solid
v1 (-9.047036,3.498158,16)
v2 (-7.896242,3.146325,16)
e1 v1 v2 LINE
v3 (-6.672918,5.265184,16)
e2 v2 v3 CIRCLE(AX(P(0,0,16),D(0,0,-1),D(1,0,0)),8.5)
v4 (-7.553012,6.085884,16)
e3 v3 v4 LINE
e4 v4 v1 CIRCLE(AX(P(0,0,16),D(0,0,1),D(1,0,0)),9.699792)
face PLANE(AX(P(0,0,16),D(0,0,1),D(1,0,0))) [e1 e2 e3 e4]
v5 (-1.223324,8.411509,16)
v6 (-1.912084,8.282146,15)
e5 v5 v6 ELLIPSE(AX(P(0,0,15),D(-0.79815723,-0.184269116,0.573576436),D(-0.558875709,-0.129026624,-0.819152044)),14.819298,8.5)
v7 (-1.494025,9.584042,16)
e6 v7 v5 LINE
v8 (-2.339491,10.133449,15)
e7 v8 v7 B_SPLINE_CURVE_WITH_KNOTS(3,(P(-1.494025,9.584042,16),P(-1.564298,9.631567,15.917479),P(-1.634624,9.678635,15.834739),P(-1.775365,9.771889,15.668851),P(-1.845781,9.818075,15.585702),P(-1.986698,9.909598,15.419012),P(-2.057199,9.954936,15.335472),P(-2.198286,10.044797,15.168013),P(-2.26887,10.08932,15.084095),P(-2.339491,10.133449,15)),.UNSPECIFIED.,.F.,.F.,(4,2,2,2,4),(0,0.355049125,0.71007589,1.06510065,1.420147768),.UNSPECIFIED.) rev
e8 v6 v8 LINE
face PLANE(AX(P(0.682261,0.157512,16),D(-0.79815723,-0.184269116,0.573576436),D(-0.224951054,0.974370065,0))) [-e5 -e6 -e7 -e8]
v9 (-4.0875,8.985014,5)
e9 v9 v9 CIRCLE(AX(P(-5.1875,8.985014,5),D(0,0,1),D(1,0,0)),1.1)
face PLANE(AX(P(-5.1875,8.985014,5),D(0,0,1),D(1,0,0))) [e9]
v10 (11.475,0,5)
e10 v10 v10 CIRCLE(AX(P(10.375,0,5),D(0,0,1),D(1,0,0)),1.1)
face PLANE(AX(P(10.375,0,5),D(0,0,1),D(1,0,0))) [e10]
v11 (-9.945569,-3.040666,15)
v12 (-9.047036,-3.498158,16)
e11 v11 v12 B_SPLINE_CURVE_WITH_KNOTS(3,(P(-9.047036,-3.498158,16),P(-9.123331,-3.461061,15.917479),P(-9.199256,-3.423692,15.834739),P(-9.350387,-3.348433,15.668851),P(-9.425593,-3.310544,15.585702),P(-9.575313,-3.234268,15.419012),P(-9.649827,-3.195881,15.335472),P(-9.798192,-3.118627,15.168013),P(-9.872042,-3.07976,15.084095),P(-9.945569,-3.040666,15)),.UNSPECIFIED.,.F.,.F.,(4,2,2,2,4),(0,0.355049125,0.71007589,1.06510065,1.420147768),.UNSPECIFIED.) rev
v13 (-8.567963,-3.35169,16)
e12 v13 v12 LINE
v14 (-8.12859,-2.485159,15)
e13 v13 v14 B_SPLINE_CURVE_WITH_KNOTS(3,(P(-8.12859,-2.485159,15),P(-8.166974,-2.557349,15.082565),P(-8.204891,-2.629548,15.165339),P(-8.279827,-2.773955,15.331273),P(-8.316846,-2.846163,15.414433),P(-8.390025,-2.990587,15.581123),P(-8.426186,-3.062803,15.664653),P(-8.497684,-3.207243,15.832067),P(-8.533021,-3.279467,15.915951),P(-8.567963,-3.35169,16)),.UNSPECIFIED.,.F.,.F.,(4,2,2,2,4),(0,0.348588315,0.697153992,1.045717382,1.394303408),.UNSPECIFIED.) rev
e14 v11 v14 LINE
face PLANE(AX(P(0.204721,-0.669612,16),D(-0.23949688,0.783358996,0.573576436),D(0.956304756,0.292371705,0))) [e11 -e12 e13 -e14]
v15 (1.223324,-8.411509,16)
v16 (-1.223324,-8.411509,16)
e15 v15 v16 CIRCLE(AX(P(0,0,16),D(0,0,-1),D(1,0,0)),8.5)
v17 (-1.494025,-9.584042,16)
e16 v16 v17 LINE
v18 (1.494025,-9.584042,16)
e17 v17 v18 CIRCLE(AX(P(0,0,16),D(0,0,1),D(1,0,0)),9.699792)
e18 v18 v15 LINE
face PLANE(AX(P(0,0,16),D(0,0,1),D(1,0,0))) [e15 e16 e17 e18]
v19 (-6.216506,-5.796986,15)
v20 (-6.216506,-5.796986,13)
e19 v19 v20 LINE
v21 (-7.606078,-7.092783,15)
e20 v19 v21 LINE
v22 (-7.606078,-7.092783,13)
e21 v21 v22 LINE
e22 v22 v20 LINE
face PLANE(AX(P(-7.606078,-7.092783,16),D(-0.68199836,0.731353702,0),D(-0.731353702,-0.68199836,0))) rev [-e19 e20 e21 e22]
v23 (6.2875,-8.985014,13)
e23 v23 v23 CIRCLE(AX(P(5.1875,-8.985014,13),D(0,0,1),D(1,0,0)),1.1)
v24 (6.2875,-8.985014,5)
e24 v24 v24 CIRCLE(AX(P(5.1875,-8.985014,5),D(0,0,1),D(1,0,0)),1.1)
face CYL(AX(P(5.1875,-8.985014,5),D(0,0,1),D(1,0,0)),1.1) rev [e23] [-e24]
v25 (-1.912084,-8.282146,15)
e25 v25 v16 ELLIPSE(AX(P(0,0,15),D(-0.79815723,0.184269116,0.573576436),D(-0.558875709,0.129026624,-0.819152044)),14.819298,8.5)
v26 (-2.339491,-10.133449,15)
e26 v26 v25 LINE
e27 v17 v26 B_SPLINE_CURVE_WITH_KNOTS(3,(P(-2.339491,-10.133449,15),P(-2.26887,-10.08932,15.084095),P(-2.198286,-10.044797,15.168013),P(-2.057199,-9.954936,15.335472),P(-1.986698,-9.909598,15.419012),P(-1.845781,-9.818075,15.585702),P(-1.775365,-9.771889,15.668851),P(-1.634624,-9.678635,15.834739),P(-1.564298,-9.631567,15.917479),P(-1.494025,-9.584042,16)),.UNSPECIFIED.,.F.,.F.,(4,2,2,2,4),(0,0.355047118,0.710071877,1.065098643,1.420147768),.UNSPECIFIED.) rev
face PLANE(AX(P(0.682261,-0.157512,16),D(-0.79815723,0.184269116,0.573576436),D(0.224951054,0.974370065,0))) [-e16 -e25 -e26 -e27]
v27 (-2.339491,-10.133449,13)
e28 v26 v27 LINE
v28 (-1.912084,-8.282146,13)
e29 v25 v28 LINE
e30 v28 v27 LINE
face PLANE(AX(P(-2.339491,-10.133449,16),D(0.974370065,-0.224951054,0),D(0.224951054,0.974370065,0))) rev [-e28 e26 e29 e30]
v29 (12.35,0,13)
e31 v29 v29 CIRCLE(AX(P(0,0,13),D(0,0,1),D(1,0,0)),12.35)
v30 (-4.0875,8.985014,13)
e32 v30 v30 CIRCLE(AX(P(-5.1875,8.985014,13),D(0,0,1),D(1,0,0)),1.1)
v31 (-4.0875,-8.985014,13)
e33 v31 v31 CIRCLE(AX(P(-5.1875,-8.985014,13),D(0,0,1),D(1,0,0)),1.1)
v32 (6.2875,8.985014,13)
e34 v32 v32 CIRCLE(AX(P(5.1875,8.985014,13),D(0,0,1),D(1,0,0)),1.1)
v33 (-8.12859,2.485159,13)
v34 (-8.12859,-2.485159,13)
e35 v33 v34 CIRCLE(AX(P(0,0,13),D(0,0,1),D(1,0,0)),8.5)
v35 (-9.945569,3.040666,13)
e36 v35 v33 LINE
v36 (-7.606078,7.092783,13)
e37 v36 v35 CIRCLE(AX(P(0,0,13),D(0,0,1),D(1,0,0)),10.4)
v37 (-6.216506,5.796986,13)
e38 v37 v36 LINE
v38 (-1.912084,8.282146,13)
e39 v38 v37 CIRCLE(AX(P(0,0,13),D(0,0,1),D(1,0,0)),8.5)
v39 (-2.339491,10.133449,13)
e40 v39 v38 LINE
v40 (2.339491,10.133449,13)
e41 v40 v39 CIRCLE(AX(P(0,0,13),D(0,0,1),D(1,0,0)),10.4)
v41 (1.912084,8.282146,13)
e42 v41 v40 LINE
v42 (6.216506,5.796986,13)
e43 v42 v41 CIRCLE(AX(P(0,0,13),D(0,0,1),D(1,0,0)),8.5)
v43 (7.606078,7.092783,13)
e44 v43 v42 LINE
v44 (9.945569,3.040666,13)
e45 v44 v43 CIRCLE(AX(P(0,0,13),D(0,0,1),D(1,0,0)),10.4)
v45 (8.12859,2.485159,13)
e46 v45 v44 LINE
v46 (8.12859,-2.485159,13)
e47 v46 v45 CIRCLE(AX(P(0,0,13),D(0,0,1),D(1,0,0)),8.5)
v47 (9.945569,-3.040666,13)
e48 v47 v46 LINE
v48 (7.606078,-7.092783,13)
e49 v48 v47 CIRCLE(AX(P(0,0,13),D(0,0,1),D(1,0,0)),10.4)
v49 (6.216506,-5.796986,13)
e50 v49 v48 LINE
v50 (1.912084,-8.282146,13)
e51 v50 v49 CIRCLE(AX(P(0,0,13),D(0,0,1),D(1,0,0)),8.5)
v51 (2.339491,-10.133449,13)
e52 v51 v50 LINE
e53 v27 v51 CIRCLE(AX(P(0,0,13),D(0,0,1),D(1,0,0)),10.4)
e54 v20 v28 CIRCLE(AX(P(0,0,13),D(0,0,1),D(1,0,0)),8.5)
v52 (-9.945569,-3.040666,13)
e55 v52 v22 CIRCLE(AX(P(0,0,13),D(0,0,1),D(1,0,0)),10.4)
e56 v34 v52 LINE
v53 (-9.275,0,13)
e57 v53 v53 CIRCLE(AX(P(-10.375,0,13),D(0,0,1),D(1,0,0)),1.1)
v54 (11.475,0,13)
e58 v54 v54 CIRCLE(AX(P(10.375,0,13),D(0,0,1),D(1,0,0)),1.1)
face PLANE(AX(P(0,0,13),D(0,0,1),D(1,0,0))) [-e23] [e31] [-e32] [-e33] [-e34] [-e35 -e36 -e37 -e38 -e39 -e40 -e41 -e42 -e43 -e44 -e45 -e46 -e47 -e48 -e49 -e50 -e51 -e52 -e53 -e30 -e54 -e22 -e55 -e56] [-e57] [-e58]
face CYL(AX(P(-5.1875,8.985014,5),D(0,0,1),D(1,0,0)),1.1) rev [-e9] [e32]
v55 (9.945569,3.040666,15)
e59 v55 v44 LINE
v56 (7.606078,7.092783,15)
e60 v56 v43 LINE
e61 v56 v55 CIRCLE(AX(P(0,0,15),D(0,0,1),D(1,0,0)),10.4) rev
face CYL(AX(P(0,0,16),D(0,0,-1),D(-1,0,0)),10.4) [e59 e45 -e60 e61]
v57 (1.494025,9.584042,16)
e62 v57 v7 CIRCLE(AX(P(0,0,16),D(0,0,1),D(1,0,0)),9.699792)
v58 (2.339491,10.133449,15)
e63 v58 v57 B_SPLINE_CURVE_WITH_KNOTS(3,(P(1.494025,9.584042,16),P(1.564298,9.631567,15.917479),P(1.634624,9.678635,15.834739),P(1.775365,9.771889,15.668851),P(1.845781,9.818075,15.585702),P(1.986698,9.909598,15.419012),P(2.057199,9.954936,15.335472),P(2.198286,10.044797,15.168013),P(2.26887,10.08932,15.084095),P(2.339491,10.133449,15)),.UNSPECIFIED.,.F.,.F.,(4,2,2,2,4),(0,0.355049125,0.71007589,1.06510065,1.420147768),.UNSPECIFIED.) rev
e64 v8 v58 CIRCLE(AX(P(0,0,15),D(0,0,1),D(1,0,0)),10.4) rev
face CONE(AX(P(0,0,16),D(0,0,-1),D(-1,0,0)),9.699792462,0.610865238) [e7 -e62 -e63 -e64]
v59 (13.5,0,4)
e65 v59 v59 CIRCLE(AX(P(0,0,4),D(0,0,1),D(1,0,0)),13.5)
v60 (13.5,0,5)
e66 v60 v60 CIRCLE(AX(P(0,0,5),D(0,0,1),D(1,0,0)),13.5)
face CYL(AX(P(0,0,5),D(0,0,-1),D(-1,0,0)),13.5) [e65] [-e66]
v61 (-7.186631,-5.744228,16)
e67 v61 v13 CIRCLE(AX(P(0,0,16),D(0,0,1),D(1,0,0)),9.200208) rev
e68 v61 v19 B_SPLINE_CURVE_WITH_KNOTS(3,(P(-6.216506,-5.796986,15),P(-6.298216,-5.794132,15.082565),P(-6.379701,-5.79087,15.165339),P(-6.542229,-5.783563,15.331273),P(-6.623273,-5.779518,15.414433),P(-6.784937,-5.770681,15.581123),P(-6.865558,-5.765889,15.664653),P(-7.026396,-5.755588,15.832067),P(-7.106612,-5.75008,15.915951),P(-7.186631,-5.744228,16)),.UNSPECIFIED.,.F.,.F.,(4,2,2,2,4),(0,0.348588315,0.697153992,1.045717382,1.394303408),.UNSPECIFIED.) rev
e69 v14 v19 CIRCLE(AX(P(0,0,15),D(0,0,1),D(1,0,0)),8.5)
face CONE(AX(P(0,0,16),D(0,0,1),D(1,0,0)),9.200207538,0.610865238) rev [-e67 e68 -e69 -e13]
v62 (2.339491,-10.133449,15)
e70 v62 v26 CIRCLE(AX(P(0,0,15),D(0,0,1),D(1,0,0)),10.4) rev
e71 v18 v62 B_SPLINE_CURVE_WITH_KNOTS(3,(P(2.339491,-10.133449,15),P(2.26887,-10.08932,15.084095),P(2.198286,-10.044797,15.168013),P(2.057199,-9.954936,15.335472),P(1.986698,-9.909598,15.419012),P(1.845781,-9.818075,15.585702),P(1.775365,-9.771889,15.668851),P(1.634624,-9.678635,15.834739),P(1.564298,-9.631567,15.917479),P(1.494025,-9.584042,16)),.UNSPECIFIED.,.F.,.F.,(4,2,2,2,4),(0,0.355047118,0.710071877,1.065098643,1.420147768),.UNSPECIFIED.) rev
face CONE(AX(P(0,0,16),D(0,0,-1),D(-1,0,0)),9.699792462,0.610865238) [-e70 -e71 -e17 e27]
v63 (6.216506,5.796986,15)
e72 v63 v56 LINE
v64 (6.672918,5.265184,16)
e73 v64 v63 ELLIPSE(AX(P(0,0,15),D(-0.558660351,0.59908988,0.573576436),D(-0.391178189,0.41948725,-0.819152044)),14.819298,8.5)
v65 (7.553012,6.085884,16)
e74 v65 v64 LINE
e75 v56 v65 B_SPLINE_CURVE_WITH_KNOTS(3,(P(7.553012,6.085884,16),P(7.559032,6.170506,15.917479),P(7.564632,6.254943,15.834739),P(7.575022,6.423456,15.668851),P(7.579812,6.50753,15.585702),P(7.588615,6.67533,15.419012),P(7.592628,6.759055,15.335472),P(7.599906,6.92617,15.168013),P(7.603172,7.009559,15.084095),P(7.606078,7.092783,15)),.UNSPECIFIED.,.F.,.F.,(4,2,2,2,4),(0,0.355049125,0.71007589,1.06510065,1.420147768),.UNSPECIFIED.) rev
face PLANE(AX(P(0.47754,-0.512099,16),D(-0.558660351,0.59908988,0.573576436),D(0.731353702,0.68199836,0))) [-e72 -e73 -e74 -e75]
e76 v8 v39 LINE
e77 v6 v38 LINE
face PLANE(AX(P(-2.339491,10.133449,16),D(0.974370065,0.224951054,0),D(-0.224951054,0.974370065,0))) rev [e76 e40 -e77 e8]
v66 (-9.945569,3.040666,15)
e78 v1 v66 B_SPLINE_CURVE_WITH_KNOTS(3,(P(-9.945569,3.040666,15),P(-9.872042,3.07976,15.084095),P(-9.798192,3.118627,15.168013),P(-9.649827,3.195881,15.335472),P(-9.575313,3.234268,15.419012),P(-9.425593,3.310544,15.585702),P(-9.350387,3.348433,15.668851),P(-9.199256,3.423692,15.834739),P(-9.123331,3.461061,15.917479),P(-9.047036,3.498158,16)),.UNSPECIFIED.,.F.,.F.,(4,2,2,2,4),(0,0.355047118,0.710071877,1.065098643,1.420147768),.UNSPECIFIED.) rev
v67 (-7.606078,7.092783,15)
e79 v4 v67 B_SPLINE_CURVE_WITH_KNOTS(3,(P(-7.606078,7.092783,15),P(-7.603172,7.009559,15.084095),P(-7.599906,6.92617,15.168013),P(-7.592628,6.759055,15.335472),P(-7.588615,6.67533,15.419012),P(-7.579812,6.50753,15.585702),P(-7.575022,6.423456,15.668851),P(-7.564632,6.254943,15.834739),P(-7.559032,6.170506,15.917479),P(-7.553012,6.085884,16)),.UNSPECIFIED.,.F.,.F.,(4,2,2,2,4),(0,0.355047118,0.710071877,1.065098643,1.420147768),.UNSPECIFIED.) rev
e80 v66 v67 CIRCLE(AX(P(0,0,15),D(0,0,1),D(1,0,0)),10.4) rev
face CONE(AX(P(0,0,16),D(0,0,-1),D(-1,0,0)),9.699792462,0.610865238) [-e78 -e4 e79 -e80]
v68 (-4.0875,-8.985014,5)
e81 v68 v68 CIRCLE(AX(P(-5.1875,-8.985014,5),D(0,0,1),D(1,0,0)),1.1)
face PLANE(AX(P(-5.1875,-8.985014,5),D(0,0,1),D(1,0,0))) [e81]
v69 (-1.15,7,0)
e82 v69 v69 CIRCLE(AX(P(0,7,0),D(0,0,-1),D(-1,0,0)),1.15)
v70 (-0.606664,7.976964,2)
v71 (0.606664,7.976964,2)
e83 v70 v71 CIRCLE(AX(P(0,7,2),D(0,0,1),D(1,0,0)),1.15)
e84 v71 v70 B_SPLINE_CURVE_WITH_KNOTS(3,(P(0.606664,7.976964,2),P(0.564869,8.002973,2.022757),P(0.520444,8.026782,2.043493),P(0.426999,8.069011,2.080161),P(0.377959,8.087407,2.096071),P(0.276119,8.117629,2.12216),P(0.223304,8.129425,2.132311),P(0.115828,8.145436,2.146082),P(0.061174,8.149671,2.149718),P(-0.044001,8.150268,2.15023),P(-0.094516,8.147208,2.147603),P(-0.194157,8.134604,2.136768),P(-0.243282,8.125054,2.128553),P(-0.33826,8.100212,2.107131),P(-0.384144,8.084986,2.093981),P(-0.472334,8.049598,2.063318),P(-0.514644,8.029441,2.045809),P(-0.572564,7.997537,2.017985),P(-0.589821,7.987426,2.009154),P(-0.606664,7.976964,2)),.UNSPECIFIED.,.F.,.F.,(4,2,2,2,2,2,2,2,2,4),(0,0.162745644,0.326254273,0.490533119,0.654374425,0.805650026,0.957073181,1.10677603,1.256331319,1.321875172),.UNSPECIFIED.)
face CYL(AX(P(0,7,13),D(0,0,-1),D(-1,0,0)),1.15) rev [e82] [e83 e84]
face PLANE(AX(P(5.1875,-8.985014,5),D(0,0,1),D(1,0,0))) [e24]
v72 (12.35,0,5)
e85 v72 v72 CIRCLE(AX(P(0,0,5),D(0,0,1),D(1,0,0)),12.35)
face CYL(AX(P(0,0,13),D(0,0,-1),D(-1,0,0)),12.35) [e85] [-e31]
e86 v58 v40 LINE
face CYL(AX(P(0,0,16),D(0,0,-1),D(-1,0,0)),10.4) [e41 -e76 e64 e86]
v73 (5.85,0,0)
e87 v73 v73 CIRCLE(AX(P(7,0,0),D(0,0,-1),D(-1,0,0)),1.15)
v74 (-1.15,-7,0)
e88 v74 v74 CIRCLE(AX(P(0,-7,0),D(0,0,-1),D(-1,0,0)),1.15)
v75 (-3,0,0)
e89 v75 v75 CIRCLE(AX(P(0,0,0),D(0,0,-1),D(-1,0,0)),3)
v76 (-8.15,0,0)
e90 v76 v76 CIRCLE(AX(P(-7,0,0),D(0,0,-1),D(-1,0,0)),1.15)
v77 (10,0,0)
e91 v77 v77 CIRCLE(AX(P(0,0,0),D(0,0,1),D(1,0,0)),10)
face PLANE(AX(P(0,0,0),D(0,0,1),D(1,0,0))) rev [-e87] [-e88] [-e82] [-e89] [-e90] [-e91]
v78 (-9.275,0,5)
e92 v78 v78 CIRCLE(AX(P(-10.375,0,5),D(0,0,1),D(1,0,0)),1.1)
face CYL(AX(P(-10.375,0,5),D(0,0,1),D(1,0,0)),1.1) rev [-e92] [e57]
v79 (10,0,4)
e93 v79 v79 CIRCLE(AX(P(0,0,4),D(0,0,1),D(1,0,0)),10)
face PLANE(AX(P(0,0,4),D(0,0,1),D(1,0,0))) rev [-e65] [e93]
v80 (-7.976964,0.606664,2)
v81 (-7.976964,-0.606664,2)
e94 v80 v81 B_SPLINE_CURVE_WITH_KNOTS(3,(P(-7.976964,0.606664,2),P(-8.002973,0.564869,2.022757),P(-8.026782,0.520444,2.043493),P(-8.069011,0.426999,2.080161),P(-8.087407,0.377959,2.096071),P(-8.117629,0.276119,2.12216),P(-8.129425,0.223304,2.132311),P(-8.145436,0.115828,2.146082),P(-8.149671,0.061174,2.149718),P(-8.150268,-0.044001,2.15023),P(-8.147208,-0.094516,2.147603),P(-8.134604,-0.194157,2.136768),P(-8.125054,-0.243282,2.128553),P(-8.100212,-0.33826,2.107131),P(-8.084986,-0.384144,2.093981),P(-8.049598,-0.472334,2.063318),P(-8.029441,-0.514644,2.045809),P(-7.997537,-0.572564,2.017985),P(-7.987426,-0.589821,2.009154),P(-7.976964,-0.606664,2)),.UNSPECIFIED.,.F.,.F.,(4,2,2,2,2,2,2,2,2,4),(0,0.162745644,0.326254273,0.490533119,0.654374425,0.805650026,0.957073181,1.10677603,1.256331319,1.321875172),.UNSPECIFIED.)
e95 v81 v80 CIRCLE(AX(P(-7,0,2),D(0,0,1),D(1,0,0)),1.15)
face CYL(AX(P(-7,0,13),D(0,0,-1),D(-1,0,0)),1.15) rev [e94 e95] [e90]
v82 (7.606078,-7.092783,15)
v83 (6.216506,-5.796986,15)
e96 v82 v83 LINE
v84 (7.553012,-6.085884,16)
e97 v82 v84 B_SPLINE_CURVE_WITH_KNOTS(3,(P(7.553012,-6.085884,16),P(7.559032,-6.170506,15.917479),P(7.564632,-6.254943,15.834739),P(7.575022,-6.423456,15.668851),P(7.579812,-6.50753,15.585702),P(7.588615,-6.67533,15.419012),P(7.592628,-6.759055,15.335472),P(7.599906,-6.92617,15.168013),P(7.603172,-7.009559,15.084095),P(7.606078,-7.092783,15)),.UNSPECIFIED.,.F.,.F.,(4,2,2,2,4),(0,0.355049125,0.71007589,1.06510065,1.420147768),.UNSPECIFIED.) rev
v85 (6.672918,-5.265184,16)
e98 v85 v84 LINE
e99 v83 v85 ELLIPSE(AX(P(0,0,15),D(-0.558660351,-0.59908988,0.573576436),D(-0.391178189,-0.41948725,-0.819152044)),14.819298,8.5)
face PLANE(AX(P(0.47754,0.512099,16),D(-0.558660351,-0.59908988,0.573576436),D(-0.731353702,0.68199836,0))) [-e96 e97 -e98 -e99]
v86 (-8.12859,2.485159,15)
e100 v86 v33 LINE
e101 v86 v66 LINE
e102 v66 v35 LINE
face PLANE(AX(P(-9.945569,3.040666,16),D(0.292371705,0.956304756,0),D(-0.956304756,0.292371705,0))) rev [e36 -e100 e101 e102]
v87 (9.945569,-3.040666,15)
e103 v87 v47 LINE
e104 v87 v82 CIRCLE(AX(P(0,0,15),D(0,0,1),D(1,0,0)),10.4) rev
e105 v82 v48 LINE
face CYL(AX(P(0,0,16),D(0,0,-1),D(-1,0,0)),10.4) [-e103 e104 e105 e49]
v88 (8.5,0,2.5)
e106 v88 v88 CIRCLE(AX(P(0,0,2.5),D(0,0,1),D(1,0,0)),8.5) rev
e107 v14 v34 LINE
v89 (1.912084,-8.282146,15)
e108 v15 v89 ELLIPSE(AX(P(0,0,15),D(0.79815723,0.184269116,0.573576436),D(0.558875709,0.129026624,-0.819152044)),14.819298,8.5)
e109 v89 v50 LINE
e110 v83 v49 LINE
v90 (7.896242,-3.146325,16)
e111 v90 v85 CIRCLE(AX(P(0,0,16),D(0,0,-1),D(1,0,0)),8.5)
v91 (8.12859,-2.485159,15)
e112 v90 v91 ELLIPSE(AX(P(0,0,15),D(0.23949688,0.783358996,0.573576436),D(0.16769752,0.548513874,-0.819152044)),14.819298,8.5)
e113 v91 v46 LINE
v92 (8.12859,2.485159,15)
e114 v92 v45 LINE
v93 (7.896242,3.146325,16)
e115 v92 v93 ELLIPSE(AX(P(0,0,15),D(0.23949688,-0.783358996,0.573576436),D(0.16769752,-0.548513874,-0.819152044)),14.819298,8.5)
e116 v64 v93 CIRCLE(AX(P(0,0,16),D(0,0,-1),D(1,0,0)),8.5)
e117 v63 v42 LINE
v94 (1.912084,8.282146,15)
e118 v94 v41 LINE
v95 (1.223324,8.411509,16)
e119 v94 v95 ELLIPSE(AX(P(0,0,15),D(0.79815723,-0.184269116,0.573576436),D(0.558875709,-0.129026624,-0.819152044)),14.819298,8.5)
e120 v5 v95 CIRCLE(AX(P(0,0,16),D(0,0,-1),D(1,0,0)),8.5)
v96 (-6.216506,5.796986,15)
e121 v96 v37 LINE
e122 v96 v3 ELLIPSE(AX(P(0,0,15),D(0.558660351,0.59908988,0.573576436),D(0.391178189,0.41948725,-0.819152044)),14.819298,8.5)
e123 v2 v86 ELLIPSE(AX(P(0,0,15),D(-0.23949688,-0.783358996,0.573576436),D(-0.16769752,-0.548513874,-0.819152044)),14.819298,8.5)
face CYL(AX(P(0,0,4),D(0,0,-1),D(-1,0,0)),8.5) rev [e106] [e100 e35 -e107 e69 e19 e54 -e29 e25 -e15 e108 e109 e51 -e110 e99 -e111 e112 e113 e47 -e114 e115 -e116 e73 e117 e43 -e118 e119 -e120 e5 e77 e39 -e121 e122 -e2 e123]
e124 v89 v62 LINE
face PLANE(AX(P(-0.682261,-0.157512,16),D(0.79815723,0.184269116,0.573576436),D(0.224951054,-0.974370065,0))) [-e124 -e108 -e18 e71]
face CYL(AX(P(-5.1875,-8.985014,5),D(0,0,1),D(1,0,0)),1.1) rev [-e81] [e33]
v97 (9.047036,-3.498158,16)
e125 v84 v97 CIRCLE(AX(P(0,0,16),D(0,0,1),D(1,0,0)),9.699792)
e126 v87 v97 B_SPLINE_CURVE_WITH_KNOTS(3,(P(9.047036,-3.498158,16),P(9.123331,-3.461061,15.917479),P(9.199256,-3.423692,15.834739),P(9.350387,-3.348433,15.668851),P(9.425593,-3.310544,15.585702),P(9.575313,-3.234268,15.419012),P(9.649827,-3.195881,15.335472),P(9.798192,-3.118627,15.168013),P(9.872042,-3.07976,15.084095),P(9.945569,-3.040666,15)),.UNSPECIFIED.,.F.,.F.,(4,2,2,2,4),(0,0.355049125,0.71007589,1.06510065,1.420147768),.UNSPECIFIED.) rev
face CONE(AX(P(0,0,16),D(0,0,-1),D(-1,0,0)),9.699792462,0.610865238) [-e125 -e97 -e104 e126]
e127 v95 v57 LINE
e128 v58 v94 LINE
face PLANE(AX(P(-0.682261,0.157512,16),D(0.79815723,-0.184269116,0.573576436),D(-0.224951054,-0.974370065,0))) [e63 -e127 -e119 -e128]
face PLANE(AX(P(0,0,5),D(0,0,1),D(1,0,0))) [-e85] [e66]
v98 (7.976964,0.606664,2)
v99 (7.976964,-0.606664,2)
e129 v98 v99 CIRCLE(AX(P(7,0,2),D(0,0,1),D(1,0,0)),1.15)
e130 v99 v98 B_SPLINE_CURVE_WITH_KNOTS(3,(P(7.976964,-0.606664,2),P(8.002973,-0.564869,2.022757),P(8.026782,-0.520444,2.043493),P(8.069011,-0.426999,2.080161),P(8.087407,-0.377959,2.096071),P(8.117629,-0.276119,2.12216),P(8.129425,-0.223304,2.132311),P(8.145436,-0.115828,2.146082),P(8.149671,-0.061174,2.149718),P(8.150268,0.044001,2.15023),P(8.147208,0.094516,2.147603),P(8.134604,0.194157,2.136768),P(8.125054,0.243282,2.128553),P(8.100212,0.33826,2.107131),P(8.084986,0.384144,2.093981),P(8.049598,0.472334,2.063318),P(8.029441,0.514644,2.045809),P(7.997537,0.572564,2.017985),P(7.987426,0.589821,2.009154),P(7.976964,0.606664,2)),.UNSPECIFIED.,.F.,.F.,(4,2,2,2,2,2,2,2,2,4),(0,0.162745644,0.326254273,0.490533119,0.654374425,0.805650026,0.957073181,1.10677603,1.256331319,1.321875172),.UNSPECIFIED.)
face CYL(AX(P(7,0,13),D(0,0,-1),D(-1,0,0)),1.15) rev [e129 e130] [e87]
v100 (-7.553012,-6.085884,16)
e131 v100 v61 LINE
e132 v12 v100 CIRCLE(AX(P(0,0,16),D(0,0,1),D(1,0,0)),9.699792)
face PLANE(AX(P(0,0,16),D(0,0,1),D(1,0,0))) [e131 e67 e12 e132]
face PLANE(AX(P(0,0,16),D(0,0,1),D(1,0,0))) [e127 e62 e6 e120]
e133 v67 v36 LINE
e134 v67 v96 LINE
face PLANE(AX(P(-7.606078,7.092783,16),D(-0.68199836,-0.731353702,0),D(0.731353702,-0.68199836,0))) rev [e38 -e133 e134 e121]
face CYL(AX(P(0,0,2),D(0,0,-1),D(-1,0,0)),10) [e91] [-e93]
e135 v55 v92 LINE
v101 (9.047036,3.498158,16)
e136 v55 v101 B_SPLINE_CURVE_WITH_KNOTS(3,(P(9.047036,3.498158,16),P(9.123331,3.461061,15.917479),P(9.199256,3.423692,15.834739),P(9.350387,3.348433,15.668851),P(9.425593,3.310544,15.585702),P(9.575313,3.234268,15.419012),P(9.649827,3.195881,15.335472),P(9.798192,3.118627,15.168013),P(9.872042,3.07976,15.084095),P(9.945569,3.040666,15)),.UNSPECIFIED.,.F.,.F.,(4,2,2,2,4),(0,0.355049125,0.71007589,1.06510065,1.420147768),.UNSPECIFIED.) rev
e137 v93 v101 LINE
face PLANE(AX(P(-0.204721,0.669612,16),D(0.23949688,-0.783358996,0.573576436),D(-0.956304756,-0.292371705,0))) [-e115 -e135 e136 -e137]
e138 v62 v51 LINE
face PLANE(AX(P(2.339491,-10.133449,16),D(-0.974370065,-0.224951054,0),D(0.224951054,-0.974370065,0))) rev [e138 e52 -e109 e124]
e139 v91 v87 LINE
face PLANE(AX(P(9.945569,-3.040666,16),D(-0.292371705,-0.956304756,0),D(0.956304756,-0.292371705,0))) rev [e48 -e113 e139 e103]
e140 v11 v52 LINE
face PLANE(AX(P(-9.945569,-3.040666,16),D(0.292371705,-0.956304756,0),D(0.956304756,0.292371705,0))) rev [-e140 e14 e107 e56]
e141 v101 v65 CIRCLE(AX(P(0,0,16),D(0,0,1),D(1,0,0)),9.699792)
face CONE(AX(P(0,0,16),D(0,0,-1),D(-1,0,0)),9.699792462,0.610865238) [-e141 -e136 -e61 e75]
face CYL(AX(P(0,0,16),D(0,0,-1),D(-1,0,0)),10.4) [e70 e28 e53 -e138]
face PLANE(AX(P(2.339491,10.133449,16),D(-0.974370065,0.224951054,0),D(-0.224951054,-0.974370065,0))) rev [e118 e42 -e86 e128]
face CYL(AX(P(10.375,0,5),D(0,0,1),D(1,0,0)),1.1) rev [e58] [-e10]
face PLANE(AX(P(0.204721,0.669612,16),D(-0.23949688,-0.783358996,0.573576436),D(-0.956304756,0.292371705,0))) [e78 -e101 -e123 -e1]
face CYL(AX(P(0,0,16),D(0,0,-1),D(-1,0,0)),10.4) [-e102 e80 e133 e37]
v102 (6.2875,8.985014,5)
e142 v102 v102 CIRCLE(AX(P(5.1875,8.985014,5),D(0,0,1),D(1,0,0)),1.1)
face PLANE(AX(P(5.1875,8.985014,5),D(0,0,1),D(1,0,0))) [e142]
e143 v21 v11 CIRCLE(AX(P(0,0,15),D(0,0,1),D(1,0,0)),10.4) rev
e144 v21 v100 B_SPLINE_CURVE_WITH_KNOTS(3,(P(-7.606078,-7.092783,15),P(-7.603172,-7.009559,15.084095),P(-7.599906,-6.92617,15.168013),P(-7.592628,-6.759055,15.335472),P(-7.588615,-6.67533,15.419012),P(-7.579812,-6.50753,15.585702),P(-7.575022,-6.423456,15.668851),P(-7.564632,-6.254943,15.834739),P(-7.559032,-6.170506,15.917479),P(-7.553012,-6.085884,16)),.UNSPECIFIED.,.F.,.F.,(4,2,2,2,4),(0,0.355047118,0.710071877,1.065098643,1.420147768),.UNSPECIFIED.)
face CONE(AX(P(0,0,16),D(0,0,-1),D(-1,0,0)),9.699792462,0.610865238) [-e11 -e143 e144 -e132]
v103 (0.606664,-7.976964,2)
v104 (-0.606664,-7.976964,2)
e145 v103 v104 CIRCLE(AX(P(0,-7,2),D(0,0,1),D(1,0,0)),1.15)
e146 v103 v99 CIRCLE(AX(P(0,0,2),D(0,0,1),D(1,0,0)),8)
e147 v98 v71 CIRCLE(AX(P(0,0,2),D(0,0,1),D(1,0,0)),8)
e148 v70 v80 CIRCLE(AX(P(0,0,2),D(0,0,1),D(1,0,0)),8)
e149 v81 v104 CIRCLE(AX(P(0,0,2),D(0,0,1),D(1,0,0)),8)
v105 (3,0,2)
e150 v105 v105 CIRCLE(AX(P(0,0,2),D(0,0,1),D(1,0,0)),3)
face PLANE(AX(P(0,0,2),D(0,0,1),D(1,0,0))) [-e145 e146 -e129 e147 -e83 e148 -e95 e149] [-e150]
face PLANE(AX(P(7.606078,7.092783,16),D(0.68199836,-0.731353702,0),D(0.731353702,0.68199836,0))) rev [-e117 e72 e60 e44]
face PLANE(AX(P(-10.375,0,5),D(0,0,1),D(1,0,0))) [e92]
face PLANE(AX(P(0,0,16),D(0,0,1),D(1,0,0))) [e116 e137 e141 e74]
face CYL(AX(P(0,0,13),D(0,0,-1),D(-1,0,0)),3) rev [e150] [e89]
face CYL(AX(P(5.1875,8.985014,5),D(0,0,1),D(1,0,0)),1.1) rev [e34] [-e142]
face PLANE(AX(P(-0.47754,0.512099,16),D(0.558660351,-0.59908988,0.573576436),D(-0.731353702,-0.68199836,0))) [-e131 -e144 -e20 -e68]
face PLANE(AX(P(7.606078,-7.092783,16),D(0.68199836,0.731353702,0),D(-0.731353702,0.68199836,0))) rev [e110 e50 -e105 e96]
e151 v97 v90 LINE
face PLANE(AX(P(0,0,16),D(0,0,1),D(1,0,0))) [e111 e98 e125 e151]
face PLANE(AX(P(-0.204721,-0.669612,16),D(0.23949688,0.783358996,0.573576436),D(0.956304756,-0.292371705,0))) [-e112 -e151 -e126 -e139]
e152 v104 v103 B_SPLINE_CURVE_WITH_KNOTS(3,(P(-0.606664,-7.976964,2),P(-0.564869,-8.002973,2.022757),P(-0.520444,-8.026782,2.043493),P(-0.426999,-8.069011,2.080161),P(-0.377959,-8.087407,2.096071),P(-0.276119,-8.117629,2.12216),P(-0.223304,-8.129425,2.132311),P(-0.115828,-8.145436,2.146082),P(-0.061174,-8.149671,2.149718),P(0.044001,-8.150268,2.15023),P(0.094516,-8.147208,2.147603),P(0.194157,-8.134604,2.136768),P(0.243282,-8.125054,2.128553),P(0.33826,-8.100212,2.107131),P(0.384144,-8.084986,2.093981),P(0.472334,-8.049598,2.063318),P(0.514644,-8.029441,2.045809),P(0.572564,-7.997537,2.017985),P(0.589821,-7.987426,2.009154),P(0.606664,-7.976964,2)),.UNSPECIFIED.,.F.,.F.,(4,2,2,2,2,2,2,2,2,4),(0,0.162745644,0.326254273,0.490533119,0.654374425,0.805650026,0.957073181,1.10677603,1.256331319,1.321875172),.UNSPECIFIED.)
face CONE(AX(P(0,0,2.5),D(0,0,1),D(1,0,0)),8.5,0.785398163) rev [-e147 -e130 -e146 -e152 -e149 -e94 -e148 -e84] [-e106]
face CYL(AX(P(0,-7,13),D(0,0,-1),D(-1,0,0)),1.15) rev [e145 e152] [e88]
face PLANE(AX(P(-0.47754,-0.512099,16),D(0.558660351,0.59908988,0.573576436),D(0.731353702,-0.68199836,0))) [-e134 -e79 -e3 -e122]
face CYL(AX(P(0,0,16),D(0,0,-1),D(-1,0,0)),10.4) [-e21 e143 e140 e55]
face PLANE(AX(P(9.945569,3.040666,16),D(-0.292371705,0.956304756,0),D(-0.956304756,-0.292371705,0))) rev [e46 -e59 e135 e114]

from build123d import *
from OCP.BRepFilletAPI import BRepFilletAPI_MakeChamfer
from build123d.topology import SkipClean

# Parameters (mm, degrees)
SKETCH_1_R          = 10
EXTRUDE_1_DEPTH     = 2
SKETCH_2_R          = 10
SKETCH_2_R_2        = 8.5
EXTRUDE_2_DEPTH     = 2
SKETCH_4_R          = 13.5
SKETCH_4_R_2        = 8.5
EXTRUDE_3_DEPTH     = 1
SKETCH_5_R          = 12.35
SKETCH_5_R_2        = 8.5
EXTRUDE_4_DEPTH     = 8
SKETCH_6_R          = 1.1
CUT_EXTRUDE_1_DEPTH = 8
SKETCH_7_R          = 3
SKETCH_7_R_2        = 1.15
CUT_EXTRUDE_2_DEPTH = 24.097618925
EXTRUDE_5_DEPTH     = 3
CHAMFER_1_SIZE      = 1
CHAMFER_1_SIZE2     = 0.700207538
CHAMFER_2_SIZE      = 0.5


with BuildPart() as part:
    # 스케치1 → 보스-돌출1 (new body)
    with BuildSketch(Plane.XY):
        Circle(SKETCH_1_R)
    extrude(amount=EXTRUDE_1_DEPTH)

    # 스케치2 → 보스-돌출2 (add)
    with BuildSketch(Plane.XY.offset(2)):
        Circle(SKETCH_2_R)
        Circle(SKETCH_2_R_2, mode=Mode.SUBTRACT)
    extrude(amount=EXTRUDE_2_DEPTH)

    # 스케치4 → 보스-돌출3 (add)
    with BuildSketch(Plane.XY.offset(4)):
        Circle(SKETCH_4_R)
        Circle(SKETCH_4_R_2, mode=Mode.SUBTRACT)
    extrude(amount=EXTRUDE_3_DEPTH)

    # 스케치5 → 보스-돌출4 (add)
    with BuildSketch(Plane.XY.offset(5)):
        Circle(SKETCH_5_R)
        Circle(SKETCH_5_R_2, mode=Mode.SUBTRACT)
    extrude(amount=EXTRUDE_4_DEPTH)

    # 스케치6 → 컷-돌출1 (cut)
    with BuildSketch(Plane.XY.offset(13)):
        with Locations((10.375, 0)):
            Circle(SKETCH_6_R)
        with Locations((5.1875, -8.985013564)):
            Circle(SKETCH_6_R)
        with Locations((-5.1875, -8.985013564)):
            Circle(SKETCH_6_R)
        with Locations((-10.375, 0)):
            Circle(SKETCH_6_R)
        with Locations((-5.1875, 8.985013564)):
            Circle(SKETCH_6_R)
        with Locations((5.1875, 8.985013564)):
            Circle(SKETCH_6_R)
    extrude(amount=-CUT_EXTRUDE_1_DEPTH, mode=Mode.SUBTRACT)

    # 스케치7 → 컷-돌출2 (cut, through all)
    with BuildSketch(Plane(origin=(0, 0, 0), x_dir=(-1, 0, 0), z_dir=(0, 0, -1))):
        Circle(SKETCH_7_R)
        with Locations((-7, 0)):
            Circle(SKETCH_7_R_2)
        with Locations((7, 0)):
            Circle(SKETCH_7_R_2)
        with Locations((0, 7)):
            Circle(SKETCH_7_R_2)
        with Locations((0, -7)):
            Circle(SKETCH_7_R_2)
    extrude(amount=-CUT_EXTRUDE_2_DEPTH, mode=Mode.SUBTRACT)

    # 스케치10 → 보스-돌출5 (add)
    with SkipClean():  # the faces are left unmerged after this step: merging them gives an invalid solid
        with BuildSketch(Plane.XY.offset(13)):
            with BuildLine():
                Line((2.339490965, 10.133448674), (1.912083962, 8.282145551))
                ThreePointArc((1.912083962, 8.282145551), (0, 8.5), (-1.912083962, 8.282145551))
                Line((-1.912083962, 8.282145551), (-2.339490965, 10.133448674))
                ThreePointArc((-2.339490965, 10.133448674), (0, 10.4), (2.339490965, 10.133448674))
            make_face()
            with BuildLine():
                Line((7.606078497, 7.092782945), (6.216506464, 5.796986061))
                ThreePointArc((6.216506464, 5.796986061), (7.361215932, 4.25), (8.128590426, 2.48515949))
                Line((8.128590426, 2.48515949), (9.945569462, 3.040665729))
                ThreePointArc((9.945569462, 3.040665729), (9.006664199, 5.2), (7.606078497, 7.092782945))
            make_face()
            with BuildLine():
                Line((9.945569462, -3.040665729), (8.128590426, -2.48515949))
                ThreePointArc((8.128590426, -2.48515949), (7.361215932, -4.25), (6.216506464, -5.796986061))
                Line((6.216506464, -5.796986061), (7.606078497, -7.092782945))
                ThreePointArc((7.606078497, -7.092782945), (9.006664199, -5.2), (9.945569462, -3.040665729))
            make_face()
            with BuildLine():
                Line((2.339490965, -10.133448674), (1.912083962, -8.282145551))
                ThreePointArc((1.912083962, -8.282145551), (0, -8.5), (-1.912083962, -8.282145551))
                Line((-1.912083962, -8.282145551), (-2.339490965, -10.133448674))
                ThreePointArc((-2.339490965, -10.133448674), (0, -10.4), (2.339490965, -10.133448674))
            make_face()
            with BuildLine():
                Line((-7.606078497, -7.092782945), (-6.216506464, -5.796986061))
                ThreePointArc((-6.216506464, -5.796986061), (-7.361215932, -4.25), (-8.128590426, -2.48515949))
                Line((-8.128590426, -2.48515949), (-9.945569462, -3.040665729))
                ThreePointArc((-9.945569462, -3.040665729), (-9.006664199, -5.2), (-7.606078497, -7.092782945))
            make_face()
            with BuildLine():
                Line((-9.945569462, 3.040665729), (-8.128590426, 2.48515949))
                ThreePointArc((-8.128590426, 2.48515949), (-7.361215932, 4.25), (-6.216506464, 5.796986061))
                Line((-6.216506464, 5.796986061), (-7.606078497, 7.092782945))
                ThreePointArc((-7.606078497, 7.092782945), (-9.006664199, 5.2), (-9.945569462, 3.040665729))
            make_face()
        extrude(amount=EXTRUDE_5_DEPTH)

    # 모따기1: one chamfer whose edges measure the first distance from different faces: ONE call of the kernel's chamfer builder (chamfer() names one face for all edges)
    chamfer_1_edges_1 = [part.edges().sort_by_distance(p)[0] for p in [
        (-9.006664199, -5.2, 16),
    ]]
    chamfer_1_side_1 = [part.faces().sort_by_distance(p)[0] for p in [
        (-9.006664199, -5.2, 14.5),
    ]]
    chamfer_1_edges_2 = [part.edges().sort_by_distance(p)[0] for p in [
        (0, -10.4, 16),
    ]]
    chamfer_1_side_2 = [part.faces().sort_by_distance(p)[0] for p in [
        (0, -10.4, 14.5),
    ]]
    chamfer_1_edges_3 = [part.edges().sort_by_distance(p)[0] for p in [
        (9.006664199, -5.2, 16),
    ]]
    chamfer_1_side_3 = [part.faces().sort_by_distance(p)[0] for p in [
        (9.006664199, -5.2, 14.5),
    ]]
    chamfer_1_edges_4 = [part.edges().sort_by_distance(p)[0] for p in [
        (9.006664199, 5.2, 16),
    ]]
    chamfer_1_side_4 = [part.faces().sort_by_distance(p)[0] for p in [
        (9.006664199, 5.2, 14.5),
    ]]
    chamfer_1_edges_5 = [part.edges().sort_by_distance(p)[0] for p in [
        (0, 10.4, 16),
    ]]
    chamfer_1_side_5 = [part.faces().sort_by_distance(p)[0] for p in [
        (0, 10.4, 14.5),
    ]]
    chamfer_1_edges_6 = [part.edges().sort_by_distance(p)[0] for p in [
        (-9.006664199, 5.2, 16),
    ]]
    chamfer_1_side_6 = [part.faces().sort_by_distance(p)[0] for p in [
        (-9.006664199, 5.2, 14.5),
    ]]
    chamfer_1_edges_7 = [part.edges().sort_by_distance(p)[0] for p in [
        (-9.037079944, -2.76291261, 16),
    ]]
    chamfer_1_side_7 = [part.faces().sort_by_distance(p)[0] for p in [
        (-9.037079944, -2.76291261, 14.5),
    ]]
    chamfer_1_edges_8 = [part.edges().sort_by_distance(p)[0] for p in [
        (-7.361215932, -4.25, 16),
    ]]
    chamfer_1_side_8 = [part.faces().sort_by_distance(p)[0] for p in [
        (-7.361215932, -4.25, 14.5),
    ]]
    chamfer_1_edges_9 = [part.edges().sort_by_distance(p)[0] for p in [
        (-6.91129248, -6.444884503, 16),
    ]]
    chamfer_1_side_9 = [part.faces().sort_by_distance(p)[0] for p in [
        (-6.91129248, -6.444884503, 14.5),
    ]]
    chamfer_1_edges_10 = [part.edges().sort_by_distance(p)[0] for p in [
        (2.125787464, -9.207797112, 16),
    ]]
    chamfer_1_side_10 = [part.faces().sort_by_distance(p)[0] for p in [
        (2.125787464, -9.207797112, 14.5),
    ]]
    chamfer_1_edges_11 = [part.edges().sort_by_distance(p)[0] for p in [
        (-2.125787464, -9.207797112, 16),
    ]]
    chamfer_1_side_11 = [part.faces().sort_by_distance(p)[0] for p in [
        (-2.125787464, -9.207797112, 14.5),
    ]]
    chamfer_1_edges_12 = [part.edges().sort_by_distance(p)[0] for p in [
        (6.91129248, -6.444884503, 16),
    ]]
    chamfer_1_side_12 = [part.faces().sort_by_distance(p)[0] for p in [
        (6.91129248, -6.444884503, 14.5),
    ]]
    chamfer_1_edges_13 = [part.edges().sort_by_distance(p)[0] for p in [
        (9.037079944, -2.76291261, 16),
    ]]
    chamfer_1_side_13 = [part.faces().sort_by_distance(p)[0] for p in [
        (9.037079944, -2.76291261, 14.5),
    ]]
    chamfer_1_edges_14 = [part.edges().sort_by_distance(p)[0] for p in [
        (9.037079944, 2.76291261, 16),
    ]]
    chamfer_1_side_14 = [part.faces().sort_by_distance(p)[0] for p in [
        (9.037079944, 2.76291261, 14.5),
    ]]
    chamfer_1_edges_15 = [part.edges().sort_by_distance(p)[0] for p in [
        (6.91129248, 6.444884503, 16),
    ]]
    chamfer_1_side_15 = [part.faces().sort_by_distance(p)[0] for p in [
        (6.91129248, 6.444884503, 14.5),
    ]]
    chamfer_1_edges_16 = [part.edges().sort_by_distance(p)[0] for p in [
        (2.125787464, 9.207797112, 16),
    ]]
    chamfer_1_side_16 = [part.faces().sort_by_distance(p)[0] for p in [
        (2.125787464, 9.207797112, 14.5),
    ]]
    chamfer_1_edges_17 = [part.edges().sort_by_distance(p)[0] for p in [
        (-2.125787464, 9.207797112, 16),
    ]]
    chamfer_1_side_17 = [part.faces().sort_by_distance(p)[0] for p in [
        (-2.125787464, 9.207797112, 14.5),
    ]]
    chamfer_1_edges_18 = [part.edges().sort_by_distance(p)[0] for p in [
        (-9.037079944, 2.76291261, 16),
    ]]
    chamfer_1_side_18 = [part.faces().sort_by_distance(p)[0] for p in [
        (-9.037079944, 2.76291261, 14.5),
    ]]
    chamfer_1_edges_19 = [part.edges().sort_by_distance(p)[0] for p in [
        (-6.91129248, 6.444884503, 16),
    ]]
    chamfer_1_side_19 = [part.faces().sort_by_distance(p)[0] for p in [
        (-6.91129248, 6.444884503, 14.5),
    ]]
    chamfer_1 = BRepFilletAPI_MakeChamfer(part.part.solid().wrapped)
    for e in chamfer_1_edges_1:
        chamfer_1.Add(CHAMFER_1_SIZE, CHAMFER_1_SIZE2, e.wrapped, chamfer_1_side_1[0].wrapped)  # the first distance lies on this face
    for e in chamfer_1_edges_2:
        chamfer_1.Add(CHAMFER_1_SIZE, CHAMFER_1_SIZE2, e.wrapped, chamfer_1_side_2[0].wrapped)  # the first distance lies on this face
    for e in chamfer_1_edges_3:
        chamfer_1.Add(CHAMFER_1_SIZE, CHAMFER_1_SIZE2, e.wrapped, chamfer_1_side_3[0].wrapped)  # the first distance lies on this face
    for e in chamfer_1_edges_4:
        chamfer_1.Add(CHAMFER_1_SIZE, CHAMFER_1_SIZE2, e.wrapped, chamfer_1_side_4[0].wrapped)  # the first distance lies on this face
    for e in chamfer_1_edges_5:
        chamfer_1.Add(CHAMFER_1_SIZE, CHAMFER_1_SIZE2, e.wrapped, chamfer_1_side_5[0].wrapped)  # the first distance lies on this face
    for e in chamfer_1_edges_6:
        chamfer_1.Add(CHAMFER_1_SIZE, CHAMFER_1_SIZE2, e.wrapped, chamfer_1_side_6[0].wrapped)  # the first distance lies on this face
    for e in chamfer_1_edges_7:
        chamfer_1.Add(CHAMFER_1_SIZE, CHAMFER_1_SIZE2, e.wrapped, chamfer_1_side_7[0].wrapped)  # the first distance lies on this face
    for e in chamfer_1_edges_8:
        chamfer_1.Add(CHAMFER_1_SIZE, CHAMFER_1_SIZE2, e.wrapped, chamfer_1_side_8[0].wrapped)  # the first distance lies on this face
    for e in chamfer_1_edges_9:
        chamfer_1.Add(CHAMFER_1_SIZE, CHAMFER_1_SIZE2, e.wrapped, chamfer_1_side_9[0].wrapped)  # the first distance lies on this face
    for e in chamfer_1_edges_10:
        chamfer_1.Add(CHAMFER_1_SIZE, CHAMFER_1_SIZE2, e.wrapped, chamfer_1_side_10[0].wrapped)  # the first distance lies on this face
    for e in chamfer_1_edges_11:
        chamfer_1.Add(CHAMFER_1_SIZE, CHAMFER_1_SIZE2, e.wrapped, chamfer_1_side_11[0].wrapped)  # the first distance lies on this face
    for e in chamfer_1_edges_12:
        chamfer_1.Add(CHAMFER_1_SIZE, CHAMFER_1_SIZE2, e.wrapped, chamfer_1_side_12[0].wrapped)  # the first distance lies on this face
    for e in chamfer_1_edges_13:
        chamfer_1.Add(CHAMFER_1_SIZE, CHAMFER_1_SIZE2, e.wrapped, chamfer_1_side_13[0].wrapped)  # the first distance lies on this face
    for e in chamfer_1_edges_14:
        chamfer_1.Add(CHAMFER_1_SIZE, CHAMFER_1_SIZE2, e.wrapped, chamfer_1_side_14[0].wrapped)  # the first distance lies on this face
    for e in chamfer_1_edges_15:
        chamfer_1.Add(CHAMFER_1_SIZE, CHAMFER_1_SIZE2, e.wrapped, chamfer_1_side_15[0].wrapped)  # the first distance lies on this face
    for e in chamfer_1_edges_16:
        chamfer_1.Add(CHAMFER_1_SIZE, CHAMFER_1_SIZE2, e.wrapped, chamfer_1_side_16[0].wrapped)  # the first distance lies on this face
    for e in chamfer_1_edges_17:
        chamfer_1.Add(CHAMFER_1_SIZE, CHAMFER_1_SIZE2, e.wrapped, chamfer_1_side_17[0].wrapped)  # the first distance lies on this face
    for e in chamfer_1_edges_18:
        chamfer_1.Add(CHAMFER_1_SIZE, CHAMFER_1_SIZE2, e.wrapped, chamfer_1_side_18[0].wrapped)  # the first distance lies on this face
    for e in chamfer_1_edges_19:
        chamfer_1.Add(CHAMFER_1_SIZE, CHAMFER_1_SIZE2, e.wrapped, chamfer_1_side_19[0].wrapped)  # the first distance lies on this face
    add(Compound.cast(chamfer_1.Shape()), mode=Mode.REPLACE)

    # 모따기2
    # the kernel refuses this chamfer: 0.5 mm, written as the material it adds along each edge
    with BuildSketch(Plane(origin=(0, 0, 2), x_dir=(1, 0, 0), z_dir=(0, -1, 0))) as chamfer_2_piece_1_section:
        Polygon((8.5, CHAMFER_2_SIZE), (8.5 - CHAMFER_2_SIZE, 0), (8.5, 0), align=None)
    chamfer_2_piece_1 = revolve(axis=Axis((0, 0, 2), (0, 0, 1)), mode=Mode.PRIVATE)
    chamfer_2_piece_1 = chamfer_2_piece_1 - Plane(origin=(0, -7, 2.236368943), x_dir=(-1, 0, 0), z_dir=(0, 0, -1)) * Cylinder(1.15, 34, mode=Mode.PRIVATE)
    chamfer_2_piece_1 = chamfer_2_piece_1 - Plane(origin=(-7, 0, 2.236368943), x_dir=(-1, 0, 0), z_dir=(0, 0, -1)) * Cylinder(1.15, 34, mode=Mode.PRIVATE)
    chamfer_2_piece_1 = chamfer_2_piece_1 - Plane(origin=(7, 0, 2.236368943), x_dir=(-1, 0, 0), z_dir=(0, 0, -1)) * Cylinder(1.15, 34, mode=Mode.PRIVATE)
    chamfer_2_piece_1 = chamfer_2_piece_1 - Plane(origin=(0, 7, 2.236368943), x_dir=(-1, 0, 0), z_dir=(0, 0, -1)) * Cylinder(1.15, 34, mode=Mode.PRIVATE)
    add(chamfer_2_piece_1)


solid = part.part
